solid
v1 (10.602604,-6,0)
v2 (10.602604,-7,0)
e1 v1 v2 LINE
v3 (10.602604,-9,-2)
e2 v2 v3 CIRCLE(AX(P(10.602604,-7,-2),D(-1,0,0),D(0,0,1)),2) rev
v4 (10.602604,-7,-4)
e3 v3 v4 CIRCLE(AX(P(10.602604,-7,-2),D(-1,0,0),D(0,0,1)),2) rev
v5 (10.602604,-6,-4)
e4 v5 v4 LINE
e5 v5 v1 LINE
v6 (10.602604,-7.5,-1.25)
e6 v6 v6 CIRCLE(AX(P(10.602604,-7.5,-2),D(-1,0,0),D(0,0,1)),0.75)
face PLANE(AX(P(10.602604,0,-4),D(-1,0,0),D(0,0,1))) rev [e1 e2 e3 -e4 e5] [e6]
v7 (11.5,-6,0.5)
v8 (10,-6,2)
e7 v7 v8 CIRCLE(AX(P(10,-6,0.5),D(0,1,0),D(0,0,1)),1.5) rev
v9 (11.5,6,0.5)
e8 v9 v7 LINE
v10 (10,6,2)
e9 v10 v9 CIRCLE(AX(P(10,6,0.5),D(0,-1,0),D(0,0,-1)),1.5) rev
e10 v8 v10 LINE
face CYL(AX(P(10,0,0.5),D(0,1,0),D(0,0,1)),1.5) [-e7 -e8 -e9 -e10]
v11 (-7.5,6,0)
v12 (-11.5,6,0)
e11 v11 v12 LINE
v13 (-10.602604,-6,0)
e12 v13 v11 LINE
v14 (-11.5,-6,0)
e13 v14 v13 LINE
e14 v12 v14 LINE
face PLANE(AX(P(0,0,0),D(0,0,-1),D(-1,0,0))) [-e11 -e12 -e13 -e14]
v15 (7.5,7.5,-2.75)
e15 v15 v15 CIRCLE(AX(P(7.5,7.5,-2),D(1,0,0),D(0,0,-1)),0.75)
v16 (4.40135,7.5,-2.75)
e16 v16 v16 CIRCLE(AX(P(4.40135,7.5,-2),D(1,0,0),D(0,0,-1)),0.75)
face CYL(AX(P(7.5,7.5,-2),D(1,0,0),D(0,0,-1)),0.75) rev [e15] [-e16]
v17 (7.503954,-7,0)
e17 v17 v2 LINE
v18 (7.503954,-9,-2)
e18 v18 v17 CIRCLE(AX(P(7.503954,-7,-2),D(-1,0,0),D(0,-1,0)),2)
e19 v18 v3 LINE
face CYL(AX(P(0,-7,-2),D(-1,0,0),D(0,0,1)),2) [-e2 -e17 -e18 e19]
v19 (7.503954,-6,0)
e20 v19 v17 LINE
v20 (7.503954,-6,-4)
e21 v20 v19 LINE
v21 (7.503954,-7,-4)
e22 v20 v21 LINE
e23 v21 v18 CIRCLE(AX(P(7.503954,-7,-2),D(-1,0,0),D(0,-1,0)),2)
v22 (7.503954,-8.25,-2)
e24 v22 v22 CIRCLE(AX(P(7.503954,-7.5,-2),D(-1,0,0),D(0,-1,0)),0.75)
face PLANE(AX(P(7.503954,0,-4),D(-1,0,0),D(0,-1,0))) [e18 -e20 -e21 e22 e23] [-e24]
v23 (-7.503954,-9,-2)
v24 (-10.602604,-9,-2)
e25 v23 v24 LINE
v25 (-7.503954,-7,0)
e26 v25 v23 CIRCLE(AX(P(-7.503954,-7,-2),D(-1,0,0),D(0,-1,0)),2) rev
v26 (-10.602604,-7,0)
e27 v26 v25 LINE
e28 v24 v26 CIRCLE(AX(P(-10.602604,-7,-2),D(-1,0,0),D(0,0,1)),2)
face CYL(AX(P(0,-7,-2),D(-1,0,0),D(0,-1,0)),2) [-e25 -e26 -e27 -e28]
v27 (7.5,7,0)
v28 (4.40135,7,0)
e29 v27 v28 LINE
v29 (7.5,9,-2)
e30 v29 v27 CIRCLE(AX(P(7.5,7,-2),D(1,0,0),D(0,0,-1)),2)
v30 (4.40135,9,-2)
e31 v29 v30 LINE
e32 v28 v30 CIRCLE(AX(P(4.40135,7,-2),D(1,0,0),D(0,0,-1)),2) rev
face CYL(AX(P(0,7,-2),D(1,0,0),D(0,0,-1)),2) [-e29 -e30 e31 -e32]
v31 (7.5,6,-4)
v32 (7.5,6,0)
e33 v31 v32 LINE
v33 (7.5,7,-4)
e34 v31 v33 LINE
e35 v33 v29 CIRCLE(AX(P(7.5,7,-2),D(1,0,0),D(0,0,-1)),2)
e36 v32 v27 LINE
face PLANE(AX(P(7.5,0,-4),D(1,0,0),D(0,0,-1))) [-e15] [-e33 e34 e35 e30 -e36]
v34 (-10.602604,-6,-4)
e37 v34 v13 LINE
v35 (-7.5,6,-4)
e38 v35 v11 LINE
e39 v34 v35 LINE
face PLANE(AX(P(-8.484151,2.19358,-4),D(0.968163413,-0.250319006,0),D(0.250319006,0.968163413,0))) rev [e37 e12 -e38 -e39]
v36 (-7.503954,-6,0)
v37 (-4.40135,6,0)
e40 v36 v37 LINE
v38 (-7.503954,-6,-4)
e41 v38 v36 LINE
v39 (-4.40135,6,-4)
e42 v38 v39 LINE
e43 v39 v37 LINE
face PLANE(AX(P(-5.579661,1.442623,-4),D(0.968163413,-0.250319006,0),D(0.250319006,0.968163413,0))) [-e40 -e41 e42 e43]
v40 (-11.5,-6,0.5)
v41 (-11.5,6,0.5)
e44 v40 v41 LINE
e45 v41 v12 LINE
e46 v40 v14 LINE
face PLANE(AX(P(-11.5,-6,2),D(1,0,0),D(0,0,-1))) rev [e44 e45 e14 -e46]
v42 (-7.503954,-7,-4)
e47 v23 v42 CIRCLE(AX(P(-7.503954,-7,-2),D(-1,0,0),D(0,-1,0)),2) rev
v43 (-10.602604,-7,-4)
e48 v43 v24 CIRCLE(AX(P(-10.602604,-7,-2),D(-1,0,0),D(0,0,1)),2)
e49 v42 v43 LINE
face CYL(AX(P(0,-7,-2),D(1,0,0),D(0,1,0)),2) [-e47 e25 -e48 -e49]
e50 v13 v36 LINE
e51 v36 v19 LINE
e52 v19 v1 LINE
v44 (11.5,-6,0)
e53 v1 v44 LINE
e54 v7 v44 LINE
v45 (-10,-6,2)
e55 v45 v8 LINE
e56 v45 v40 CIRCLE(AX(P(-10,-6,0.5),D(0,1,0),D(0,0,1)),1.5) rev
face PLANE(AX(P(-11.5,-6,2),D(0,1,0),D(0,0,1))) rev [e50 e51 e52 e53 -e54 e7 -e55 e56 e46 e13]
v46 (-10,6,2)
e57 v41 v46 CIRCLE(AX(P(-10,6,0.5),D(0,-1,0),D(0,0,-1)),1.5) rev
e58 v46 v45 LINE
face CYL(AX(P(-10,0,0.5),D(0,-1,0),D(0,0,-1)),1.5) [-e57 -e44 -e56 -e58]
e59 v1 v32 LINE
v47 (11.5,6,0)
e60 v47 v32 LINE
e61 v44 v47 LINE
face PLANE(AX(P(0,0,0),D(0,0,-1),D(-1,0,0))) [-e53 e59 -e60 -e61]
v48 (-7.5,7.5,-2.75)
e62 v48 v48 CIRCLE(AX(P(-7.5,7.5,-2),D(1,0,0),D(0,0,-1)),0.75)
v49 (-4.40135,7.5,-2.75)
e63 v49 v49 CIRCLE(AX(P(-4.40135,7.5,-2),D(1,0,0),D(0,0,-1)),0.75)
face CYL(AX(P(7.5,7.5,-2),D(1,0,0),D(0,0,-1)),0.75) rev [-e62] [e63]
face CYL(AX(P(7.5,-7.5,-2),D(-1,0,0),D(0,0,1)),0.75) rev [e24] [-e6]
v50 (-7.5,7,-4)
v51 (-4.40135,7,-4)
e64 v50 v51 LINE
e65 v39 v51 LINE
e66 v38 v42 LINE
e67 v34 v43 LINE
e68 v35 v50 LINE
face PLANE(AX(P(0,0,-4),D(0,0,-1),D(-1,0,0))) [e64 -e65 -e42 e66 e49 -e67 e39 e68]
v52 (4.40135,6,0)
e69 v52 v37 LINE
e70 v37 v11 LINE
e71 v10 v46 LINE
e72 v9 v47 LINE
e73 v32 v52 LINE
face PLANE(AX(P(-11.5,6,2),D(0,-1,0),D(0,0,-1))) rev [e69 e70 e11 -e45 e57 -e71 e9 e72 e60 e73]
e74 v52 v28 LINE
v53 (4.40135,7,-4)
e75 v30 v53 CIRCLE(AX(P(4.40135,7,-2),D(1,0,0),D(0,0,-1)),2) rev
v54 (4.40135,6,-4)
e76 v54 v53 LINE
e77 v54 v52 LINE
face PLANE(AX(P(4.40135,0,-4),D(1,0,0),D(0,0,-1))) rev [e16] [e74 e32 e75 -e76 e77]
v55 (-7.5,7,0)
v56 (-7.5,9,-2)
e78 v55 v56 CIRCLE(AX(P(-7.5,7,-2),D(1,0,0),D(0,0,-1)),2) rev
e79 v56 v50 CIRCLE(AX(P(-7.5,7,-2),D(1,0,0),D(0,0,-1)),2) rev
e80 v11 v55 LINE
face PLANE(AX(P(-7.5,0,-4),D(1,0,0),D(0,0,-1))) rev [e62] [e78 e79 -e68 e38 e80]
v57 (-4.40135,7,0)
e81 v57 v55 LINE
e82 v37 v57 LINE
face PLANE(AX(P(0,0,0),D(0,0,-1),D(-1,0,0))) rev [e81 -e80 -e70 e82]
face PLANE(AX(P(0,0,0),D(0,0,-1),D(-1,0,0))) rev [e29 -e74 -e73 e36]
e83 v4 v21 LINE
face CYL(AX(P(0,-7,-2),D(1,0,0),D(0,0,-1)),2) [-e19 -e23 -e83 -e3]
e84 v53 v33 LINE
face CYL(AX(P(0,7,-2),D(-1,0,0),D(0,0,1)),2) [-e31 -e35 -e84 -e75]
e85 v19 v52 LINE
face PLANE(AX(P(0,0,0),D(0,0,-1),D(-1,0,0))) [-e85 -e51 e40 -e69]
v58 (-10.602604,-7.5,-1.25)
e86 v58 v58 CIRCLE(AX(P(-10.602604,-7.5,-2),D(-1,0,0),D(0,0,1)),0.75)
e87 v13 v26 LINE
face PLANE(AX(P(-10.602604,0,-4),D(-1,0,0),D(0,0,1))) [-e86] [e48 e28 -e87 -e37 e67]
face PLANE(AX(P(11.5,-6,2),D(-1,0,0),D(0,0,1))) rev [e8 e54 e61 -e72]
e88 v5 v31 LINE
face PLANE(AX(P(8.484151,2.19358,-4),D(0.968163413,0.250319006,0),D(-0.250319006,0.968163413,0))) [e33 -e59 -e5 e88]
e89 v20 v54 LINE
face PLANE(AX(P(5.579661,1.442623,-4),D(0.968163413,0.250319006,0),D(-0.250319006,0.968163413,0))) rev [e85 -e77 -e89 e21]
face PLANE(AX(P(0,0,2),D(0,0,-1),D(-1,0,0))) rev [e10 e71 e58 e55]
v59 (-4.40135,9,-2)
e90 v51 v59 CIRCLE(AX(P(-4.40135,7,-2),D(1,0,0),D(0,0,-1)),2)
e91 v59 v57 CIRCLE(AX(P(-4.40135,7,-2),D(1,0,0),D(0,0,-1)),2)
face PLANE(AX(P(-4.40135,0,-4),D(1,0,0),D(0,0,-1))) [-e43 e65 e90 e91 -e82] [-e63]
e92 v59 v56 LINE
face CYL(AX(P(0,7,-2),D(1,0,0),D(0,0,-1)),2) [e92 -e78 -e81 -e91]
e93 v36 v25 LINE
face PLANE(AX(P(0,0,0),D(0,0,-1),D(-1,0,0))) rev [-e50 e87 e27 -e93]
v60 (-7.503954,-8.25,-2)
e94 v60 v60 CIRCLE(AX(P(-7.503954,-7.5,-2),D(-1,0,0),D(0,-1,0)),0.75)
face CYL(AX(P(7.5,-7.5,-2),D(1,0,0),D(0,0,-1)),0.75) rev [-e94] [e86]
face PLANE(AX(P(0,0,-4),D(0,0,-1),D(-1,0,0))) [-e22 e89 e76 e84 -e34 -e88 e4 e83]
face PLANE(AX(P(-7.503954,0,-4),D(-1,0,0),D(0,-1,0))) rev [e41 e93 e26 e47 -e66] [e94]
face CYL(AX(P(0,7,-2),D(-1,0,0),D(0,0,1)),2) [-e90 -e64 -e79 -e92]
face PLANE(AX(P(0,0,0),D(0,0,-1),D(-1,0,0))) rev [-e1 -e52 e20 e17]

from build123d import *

# Parameters (mm, degrees)
SKETCH2_W                      = 23
SKETCH2_H                      = 12
BOSS_EXTRUDE2_DEPTH            = 2
FILLET3_R                      = 1.5
BOSS_EXTRUDE4_DEPTH            = 4
FILLET4_R                      = 2
F_1_5MM_DOWEL_HOLE1_AT_2_COUNT = 2
F_1_5MM_DOWEL_HOLE1_AT_2_PITCH = 15
F_1_5MM_DOWEL_HOLE2_D          = 1.5
F_1_5MM_DOWEL_HOLE2_DEPTH      = 29999.549354536
F_1_5MM_DOWEL_HOLE2_TIP        = 0.450645464


with BuildPart() as part:
    # Sketch2 → Boss-Extrude2 (new body)
    with BuildSketch(Plane.XY):
        Rectangle(SKETCH2_W, SKETCH2_H)
    extrude(amount=BOSS_EXTRUDE2_DEPTH)

    # Fillet3
    fillet3_edges = [part.edges().sort_by_distance(p)[0] for p in [
        (-11.5, 0, 2),
        (11.5, 0, 2),
    ]]
    fillet(fillet3_edges, radius=FILLET3_R)

    # Sketch3 → Boss-Extrude4 (add)
    with BuildSketch(Plane(origin=(0, 0, 0), x_dir=(-1, 0, 0), z_dir=(0, 0, -1))):
        Polygon((-10.602604408, -6), (-7.5, 6), (-7.5, 9), (-4.401349547, 9), (-4.401349547, 6), (-7.503953954, -6), (-7.503953954, -9), (-10.602604408, -9), align=None)
        Polygon((7.503953954, -6), (4.401349547, 6), (4.401349547, 9), (7.5, 9), (7.5, 6), (10.602604408, -6), (10.602604408, -9), (7.503953954, -9), align=None)
    extrude(amount=BOSS_EXTRUDE4_DEPTH)

    # Fillet4
    fillet4_edges = [part.edges().sort_by_distance(p)[0] for p in [
        (-9.053279181, -9, 0),
        (-9.053279181, -9, -4),
        (9.053279181, -9, 0),
        (9.053279181, -9, -4),
        (5.950674773, 9, 0),
        (5.950674773, 9, -4),
        (-5.950674773, 9, 0),
        (-5.950674773, 9, -4),
    ]]
    fillet(fillet4_edges, radius=FILLET4_R - 0.0001)  # a hair under: the kernel refuses the full size

    # Sketch9 → Ø1.5mm Dowel Hole1 (revolve, cut)
    with BuildSketch(Plane(origin=(7.5, 7.5, -2), x_dir=(0, 0, -1), z_dir=(0, 1, 0))):
        Polygon((0, 0), (0, 30000), (0.75, 29999.549354536), (0.75, 0), align=None)
    f_1_5mm_dowel_hole1 = revolve(axis=Axis((13.85, 7.5, -2), (-1, 0, 0)), mode=Mode.SUBTRACT)

    # Ø1.5mm Dowel Hole1 at 2: Ø1.5mm Dowel Hole1 ×2
    with Locations(*[(0, -i * F_1_5MM_DOWEL_HOLE1_AT_2_PITCH, 0) for i in range(1, F_1_5MM_DOWEL_HOLE1_AT_2_COUNT)]):
        add(f_1_5mm_dowel_hole1, mode=Mode.SUBTRACT)

    # Ø1.5mm Dowel Hole2
    with Locations(Plane(origin=(7.5, -7.5, -2), x_dir=(0, 0, -1), z_dir=(-1, 0, 0))):
        with Locations((0, 0)):
            Hole(F_1_5MM_DOWEL_HOLE2_D / 2, depth=F_1_5MM_DOWEL_HOLE2_DEPTH)
            with Locations((0, 0, -(F_1_5MM_DOWEL_HOLE2_DEPTH + F_1_5MM_DOWEL_HOLE2_TIP / 2))):  # 118° drill point
                Cone(0, F_1_5MM_DOWEL_HOLE2_D / 2, F_1_5MM_DOWEL_HOLE2_TIP, mode=Mode.SUBTRACT)


solid = part.part
